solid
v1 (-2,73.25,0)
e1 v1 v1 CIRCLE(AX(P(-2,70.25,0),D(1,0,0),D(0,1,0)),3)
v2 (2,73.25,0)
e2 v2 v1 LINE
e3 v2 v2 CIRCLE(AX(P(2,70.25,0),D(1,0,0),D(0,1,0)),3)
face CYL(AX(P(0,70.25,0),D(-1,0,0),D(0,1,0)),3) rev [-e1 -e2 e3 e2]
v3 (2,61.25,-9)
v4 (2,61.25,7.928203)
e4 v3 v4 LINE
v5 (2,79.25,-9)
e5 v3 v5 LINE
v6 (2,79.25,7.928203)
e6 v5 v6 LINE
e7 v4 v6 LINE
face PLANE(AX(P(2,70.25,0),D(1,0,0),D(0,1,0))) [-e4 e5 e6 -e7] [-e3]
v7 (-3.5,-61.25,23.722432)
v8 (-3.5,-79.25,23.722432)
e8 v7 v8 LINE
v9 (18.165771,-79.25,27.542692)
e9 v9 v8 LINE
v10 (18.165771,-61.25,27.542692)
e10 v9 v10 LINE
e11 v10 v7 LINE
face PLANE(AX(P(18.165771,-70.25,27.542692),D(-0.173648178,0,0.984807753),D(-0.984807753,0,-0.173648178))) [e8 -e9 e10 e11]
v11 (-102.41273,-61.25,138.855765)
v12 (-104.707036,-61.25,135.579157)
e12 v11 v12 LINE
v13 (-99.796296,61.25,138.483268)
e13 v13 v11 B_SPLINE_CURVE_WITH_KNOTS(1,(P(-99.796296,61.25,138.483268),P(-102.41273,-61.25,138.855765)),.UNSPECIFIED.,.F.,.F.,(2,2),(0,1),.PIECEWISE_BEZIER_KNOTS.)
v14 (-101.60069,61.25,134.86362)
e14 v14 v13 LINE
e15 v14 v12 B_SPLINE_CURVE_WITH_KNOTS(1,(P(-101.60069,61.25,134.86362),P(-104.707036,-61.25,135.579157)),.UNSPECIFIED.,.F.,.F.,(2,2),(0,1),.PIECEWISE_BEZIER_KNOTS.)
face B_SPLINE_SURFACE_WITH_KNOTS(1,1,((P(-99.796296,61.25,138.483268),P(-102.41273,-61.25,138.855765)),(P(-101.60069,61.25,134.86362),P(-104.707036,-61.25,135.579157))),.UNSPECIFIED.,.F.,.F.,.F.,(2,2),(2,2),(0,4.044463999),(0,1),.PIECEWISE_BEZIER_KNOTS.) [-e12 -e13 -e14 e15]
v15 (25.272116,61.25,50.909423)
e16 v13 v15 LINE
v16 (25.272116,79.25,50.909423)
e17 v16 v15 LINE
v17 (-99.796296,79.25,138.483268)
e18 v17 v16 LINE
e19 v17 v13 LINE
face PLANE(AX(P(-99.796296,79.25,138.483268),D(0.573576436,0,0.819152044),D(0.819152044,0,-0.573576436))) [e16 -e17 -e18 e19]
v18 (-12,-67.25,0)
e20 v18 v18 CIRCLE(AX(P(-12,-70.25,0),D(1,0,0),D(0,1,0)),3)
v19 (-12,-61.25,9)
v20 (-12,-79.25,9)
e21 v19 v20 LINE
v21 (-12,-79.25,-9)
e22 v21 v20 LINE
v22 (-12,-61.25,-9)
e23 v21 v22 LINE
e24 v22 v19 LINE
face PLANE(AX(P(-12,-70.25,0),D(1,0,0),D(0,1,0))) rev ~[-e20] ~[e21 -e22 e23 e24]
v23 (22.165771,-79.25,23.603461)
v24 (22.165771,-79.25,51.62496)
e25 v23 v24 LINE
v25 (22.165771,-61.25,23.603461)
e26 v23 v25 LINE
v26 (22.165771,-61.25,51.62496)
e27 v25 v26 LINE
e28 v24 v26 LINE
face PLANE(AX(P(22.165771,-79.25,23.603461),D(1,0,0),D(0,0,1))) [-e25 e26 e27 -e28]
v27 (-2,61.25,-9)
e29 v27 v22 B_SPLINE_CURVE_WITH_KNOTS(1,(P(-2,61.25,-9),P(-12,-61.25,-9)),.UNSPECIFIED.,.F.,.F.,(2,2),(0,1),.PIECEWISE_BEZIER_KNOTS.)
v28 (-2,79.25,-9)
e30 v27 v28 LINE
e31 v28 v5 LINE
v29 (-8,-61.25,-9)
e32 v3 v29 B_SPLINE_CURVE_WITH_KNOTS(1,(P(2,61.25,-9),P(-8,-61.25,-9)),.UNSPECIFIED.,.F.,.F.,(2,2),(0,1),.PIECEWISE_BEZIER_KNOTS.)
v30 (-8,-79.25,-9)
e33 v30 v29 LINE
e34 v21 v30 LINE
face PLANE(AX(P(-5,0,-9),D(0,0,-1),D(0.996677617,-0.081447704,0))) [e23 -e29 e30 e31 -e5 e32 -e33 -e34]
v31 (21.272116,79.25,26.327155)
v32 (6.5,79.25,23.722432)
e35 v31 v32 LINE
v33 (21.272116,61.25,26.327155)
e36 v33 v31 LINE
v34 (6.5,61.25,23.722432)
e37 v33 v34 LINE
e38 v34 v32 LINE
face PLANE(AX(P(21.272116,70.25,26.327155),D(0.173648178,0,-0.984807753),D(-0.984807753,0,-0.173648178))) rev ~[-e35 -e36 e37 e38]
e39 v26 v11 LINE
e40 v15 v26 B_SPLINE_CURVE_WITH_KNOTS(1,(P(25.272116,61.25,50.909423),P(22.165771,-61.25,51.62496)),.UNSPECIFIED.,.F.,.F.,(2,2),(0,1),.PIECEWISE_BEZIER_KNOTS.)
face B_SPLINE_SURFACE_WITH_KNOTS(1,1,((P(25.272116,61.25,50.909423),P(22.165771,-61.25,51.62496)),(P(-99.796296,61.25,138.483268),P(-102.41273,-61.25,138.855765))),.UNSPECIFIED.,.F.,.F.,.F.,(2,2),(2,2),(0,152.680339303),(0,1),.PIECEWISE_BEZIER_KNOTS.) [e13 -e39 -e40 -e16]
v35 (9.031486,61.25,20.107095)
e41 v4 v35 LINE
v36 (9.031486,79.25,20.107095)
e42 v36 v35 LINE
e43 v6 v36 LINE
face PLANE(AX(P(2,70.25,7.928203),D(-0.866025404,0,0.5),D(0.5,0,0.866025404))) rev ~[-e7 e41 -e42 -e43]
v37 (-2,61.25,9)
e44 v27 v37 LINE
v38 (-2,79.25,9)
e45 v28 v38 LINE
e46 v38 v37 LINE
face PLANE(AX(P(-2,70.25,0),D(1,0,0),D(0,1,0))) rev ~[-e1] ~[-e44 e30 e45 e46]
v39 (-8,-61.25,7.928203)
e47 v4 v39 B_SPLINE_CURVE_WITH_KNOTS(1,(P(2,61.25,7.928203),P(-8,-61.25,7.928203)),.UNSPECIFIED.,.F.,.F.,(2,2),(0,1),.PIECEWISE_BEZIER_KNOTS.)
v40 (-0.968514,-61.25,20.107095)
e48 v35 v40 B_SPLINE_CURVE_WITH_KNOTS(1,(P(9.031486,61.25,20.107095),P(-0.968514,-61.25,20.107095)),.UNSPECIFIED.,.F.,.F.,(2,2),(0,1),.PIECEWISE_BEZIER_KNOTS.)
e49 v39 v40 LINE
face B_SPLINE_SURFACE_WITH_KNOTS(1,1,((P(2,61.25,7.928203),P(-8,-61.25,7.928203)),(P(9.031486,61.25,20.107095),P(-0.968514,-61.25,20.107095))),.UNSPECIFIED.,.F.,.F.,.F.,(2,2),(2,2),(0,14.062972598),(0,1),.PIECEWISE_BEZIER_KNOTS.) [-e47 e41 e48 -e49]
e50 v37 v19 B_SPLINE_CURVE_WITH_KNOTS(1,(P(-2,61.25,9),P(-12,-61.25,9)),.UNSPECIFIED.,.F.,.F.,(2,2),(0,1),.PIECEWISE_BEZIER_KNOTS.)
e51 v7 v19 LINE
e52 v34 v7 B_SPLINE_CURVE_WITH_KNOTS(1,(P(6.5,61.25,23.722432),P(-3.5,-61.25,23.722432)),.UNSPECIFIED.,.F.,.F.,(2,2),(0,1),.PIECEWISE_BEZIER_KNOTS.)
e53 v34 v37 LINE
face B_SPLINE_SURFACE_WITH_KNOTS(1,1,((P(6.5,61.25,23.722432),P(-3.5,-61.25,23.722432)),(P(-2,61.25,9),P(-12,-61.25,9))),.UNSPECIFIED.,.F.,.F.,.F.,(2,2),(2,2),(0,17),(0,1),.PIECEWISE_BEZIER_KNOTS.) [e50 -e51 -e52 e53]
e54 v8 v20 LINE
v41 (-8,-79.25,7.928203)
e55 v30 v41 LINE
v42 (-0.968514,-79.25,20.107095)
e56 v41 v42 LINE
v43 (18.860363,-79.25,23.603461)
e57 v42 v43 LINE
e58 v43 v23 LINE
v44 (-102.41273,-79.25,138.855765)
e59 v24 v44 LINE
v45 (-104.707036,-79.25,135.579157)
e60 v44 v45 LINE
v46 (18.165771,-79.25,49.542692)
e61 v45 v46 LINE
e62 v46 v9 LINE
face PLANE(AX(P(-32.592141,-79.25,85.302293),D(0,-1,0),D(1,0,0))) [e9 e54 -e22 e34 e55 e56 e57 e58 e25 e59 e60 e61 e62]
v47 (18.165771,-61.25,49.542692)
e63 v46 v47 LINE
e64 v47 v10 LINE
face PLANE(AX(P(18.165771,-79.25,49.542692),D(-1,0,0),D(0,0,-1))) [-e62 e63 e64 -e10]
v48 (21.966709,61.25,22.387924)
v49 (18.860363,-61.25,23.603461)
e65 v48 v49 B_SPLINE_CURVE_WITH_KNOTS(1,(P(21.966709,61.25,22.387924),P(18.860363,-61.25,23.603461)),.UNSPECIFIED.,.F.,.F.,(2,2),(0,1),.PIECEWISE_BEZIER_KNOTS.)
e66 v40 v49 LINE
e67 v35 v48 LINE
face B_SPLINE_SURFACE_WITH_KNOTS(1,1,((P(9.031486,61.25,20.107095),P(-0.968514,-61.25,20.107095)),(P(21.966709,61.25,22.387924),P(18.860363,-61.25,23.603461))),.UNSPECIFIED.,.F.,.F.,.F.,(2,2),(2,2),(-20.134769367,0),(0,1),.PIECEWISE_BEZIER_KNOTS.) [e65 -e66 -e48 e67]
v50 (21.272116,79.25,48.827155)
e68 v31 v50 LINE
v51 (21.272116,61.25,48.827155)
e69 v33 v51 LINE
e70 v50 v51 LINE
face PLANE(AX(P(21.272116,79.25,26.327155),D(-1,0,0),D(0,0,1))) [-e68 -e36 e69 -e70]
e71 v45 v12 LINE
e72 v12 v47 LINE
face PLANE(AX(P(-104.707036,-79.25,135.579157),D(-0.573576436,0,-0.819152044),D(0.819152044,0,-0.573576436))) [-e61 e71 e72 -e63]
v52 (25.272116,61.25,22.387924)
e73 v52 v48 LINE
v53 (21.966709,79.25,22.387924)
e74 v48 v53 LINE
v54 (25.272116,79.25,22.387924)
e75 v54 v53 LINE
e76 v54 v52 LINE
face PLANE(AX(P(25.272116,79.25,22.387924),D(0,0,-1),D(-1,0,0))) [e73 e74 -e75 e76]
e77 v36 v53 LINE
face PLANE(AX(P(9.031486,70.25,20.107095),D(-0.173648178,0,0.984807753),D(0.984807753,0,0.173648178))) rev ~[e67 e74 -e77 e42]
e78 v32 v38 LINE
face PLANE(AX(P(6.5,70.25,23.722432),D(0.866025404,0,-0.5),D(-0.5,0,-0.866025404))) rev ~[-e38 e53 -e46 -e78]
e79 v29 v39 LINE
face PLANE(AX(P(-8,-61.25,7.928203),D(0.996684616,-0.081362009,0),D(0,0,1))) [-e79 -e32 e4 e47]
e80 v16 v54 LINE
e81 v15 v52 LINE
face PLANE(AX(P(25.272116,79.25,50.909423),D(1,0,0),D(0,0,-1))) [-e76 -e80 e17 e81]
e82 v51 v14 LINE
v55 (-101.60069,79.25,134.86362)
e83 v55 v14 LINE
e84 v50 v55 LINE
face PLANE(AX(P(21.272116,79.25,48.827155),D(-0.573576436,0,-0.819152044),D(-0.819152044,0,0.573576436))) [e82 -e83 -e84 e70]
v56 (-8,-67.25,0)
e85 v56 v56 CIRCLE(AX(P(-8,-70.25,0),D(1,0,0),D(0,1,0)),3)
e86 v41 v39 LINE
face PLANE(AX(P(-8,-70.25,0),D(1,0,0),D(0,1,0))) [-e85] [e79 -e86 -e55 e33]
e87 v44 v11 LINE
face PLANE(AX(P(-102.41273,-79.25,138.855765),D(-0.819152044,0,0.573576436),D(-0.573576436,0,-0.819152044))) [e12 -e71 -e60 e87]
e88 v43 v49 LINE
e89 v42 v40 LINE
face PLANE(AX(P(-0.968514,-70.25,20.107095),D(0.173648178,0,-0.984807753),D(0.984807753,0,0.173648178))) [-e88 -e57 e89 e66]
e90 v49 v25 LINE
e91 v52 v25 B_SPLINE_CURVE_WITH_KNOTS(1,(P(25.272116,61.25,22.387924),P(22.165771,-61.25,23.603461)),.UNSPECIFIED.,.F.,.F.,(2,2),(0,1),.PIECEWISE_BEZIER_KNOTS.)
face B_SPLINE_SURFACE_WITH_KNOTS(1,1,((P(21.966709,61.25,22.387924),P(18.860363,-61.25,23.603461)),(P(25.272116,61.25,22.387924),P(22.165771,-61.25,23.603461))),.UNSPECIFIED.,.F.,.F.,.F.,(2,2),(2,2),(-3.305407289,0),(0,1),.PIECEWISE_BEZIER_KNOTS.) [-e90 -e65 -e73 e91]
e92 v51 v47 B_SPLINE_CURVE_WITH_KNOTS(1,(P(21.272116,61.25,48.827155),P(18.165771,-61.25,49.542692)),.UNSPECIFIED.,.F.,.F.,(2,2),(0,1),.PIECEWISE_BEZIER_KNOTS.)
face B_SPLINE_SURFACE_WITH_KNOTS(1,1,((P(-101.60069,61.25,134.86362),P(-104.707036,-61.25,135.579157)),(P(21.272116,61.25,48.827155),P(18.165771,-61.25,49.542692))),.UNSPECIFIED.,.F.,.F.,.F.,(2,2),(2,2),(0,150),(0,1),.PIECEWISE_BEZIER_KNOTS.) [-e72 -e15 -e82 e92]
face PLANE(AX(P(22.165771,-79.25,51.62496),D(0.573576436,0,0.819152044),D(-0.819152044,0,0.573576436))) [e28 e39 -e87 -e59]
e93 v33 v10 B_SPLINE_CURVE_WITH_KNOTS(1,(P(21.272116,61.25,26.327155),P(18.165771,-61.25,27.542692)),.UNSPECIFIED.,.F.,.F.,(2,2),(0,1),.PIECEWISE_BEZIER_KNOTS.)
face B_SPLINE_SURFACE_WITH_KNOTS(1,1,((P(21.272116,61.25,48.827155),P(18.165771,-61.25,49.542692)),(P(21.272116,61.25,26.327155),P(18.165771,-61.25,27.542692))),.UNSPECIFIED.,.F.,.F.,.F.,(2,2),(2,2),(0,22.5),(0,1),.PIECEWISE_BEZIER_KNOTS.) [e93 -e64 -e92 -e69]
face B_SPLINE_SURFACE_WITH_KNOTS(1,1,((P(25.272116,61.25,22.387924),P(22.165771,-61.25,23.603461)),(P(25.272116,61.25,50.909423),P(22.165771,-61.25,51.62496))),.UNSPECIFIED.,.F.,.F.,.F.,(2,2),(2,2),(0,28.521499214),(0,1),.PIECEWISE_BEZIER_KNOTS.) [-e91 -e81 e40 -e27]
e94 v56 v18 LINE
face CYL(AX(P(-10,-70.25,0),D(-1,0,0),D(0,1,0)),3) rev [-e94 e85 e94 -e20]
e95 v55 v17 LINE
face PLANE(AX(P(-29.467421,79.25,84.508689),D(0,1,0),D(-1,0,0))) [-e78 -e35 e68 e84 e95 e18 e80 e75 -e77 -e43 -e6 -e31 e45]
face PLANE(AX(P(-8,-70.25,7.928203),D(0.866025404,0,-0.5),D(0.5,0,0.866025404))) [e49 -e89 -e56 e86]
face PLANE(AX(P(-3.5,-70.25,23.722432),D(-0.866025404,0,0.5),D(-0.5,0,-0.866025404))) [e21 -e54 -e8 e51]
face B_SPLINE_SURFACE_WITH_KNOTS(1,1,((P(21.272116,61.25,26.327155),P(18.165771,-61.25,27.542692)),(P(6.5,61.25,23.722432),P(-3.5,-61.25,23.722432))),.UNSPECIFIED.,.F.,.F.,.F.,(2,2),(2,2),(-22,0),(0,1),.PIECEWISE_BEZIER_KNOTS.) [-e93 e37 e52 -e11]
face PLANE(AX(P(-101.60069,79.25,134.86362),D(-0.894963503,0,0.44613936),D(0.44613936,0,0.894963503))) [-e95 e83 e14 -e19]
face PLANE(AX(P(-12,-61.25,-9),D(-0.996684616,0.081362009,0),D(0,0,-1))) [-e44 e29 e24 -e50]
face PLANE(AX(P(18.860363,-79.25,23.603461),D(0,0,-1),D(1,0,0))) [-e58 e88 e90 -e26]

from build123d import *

# Parameters (mm, degrees)
F3_W           = 18
F3_H           = 18
F3_R           = 3
F4_DEPTH       = 2
F5_W           = 18
F5_H           = 18
F5_R           = 3
F6_DEPTH       = 2
F8_DEPTH       = 9
F8_DEPTH_BACK  = 9
F10_DEPTH      = 9
F10_DEPTH_BACK = 9
F12_DEPTH      = 18
F14_DEPTH      = 18


with BuildPart() as f4:
    # F3 (on Right) → F4 (new body, symmetric)
    with BuildSketch(Plane.YZ):
        with Locations((70.25, 0)):
            Rectangle(F3_W, F3_H)
        with Locations((70.25, 0)):
            Circle(F3_R, mode=Mode.SUBTRACT)
    extrude(amount=F4_DEPTH, both=True)

    # F7 (on offset) → F8 (join, two sides)
    with BuildSketch(Plane.XZ.offset(-70.25)) as f8_sk:
        Polygon((6.5, 23.7224318643), (-2, 9), (2, 9), (2, 7.9282032303), (9.0314862988, 20.1070947526), (21.9667090059, 22.3879235173), (21.2721162952, 26.3271545293), align=None)
    extrude(amount=-F8_DEPTH)
    extrude(f8_sk.sketch, amount=F8_DEPTH_BACK)

    # F11 (on face) → F12 (join, through all)
    with BuildSketch(Plane(origin=(0, 79.25, 0), x_dir=(-1, 0, 0), z_dir=(0, 1, 0))):
        Polygon((-21.9667090059, 22.3879235173), (-21.2721162952, 26.3271545293), (-21.2721162952, 48.8271545293), (101.6006903482, 134.863619982), (99.7962957674, 138.4832676497), (-25.2721162952, 50.9094227315), (-25.2721162952, 22.3879235173), align=None)
    extrude(amount=-F12_DEPTH)



with BuildPart() as f6:
    # F5 (on offset) → F6 (new body, symmetric)
    with BuildSketch(Plane.YZ.offset(-10)):
        with Locations((-70.25, 0)):
            Rectangle(F5_W, F5_H)
        with Locations((-70.25, 0)):
            Circle(F5_R, mode=Mode.SUBTRACT)
    extrude(amount=F6_DEPTH, both=True)

    # F9 (on offset) → F10 (join, two sides)
    with BuildSketch(Plane.XZ.offset(70.25)) as f10_sk:
        Polygon((18.1657705663, 27.542691773), (-3.5, 23.7224318643), (-12, 9), (-8, 9), (-8, 7.9282032303), (-0.9685137012, 20.1070947526), (18.8603632769, 23.603460761), align=None)
    extrude(amount=F10_DEPTH)
    extrude(f10_sk.sketch, amount=-F10_DEPTH_BACK)

    # F13 (on face) → F14 (join, through all)
    with BuildSketch(Plane.XZ.offset(79.25)):
        Polygon((18.1657705663, 49.542691773), (18.1657705663, 27.542691773), (18.8603632769, 23.603460761), (22.1657705663, 23.603460761), (22.1657705663, 51.6249599752), (-102.4127303317, 138.8557654028), (-104.7070360771, 135.5791572257), align=None)
    extrude(amount=-F14_DEPTH)


with BuildPart() as f4_1:
    add(f4.part)

    add(f6.part)  # F15 merges F6
    # F12_face (on face) → F15 section 0
    with BuildSketch(Plane(origin=(-21.9904596416, 61.25, 69.4287440583), x_dir=(1, 0, 0), z_dir=(0, -1, 0))):
        Polygon((19.9904596416, -60.4287440583), (19.9904596416, -78.4287440583), (23.9904596416, -78.4287440583), (23.9904596416, -61.500540828), (31.0219459404, -49.3216493057), (43.9571686475, -47.040820541), (47.2625759368, -47.040820541), (47.2625759368, -18.5193213268), (-77.8058361258, 69.0545235914), (-79.6102307066, 65.4348759237), (43.2625759368, -20.601589529), (43.2625759368, -43.101589529), (28.4904596416, -45.706312194), align=None)
    # F14_face (on face) → F15 section 1
    with BuildSketch(Plane(origin=(-25.2803198576, -61.25, 68.6471085342), x_dir=(-1, 0, 0), z_dir=(0, 1, 0))):
        Polygon((-13.2803198576, -77.6471085342), (-13.2803198576, -59.6471085342), (-21.7803198576, -44.9246766699), (-43.4460904239, -41.1044167612), (-43.4460904239, -19.1044167612), (79.4267162195, 66.9320486914), (77.1324104741, 70.2086568686), (-47.4460904239, -17.022148559), (-47.4460904239, -45.0436477733), (-44.1406831345, -45.0436477733), (-24.3118061564, -48.5400137817), (-17.2803198576, -60.7189053039), (-17.2803198576, -77.6471085342), align=None)
    loft()


solid = f4_1.part
